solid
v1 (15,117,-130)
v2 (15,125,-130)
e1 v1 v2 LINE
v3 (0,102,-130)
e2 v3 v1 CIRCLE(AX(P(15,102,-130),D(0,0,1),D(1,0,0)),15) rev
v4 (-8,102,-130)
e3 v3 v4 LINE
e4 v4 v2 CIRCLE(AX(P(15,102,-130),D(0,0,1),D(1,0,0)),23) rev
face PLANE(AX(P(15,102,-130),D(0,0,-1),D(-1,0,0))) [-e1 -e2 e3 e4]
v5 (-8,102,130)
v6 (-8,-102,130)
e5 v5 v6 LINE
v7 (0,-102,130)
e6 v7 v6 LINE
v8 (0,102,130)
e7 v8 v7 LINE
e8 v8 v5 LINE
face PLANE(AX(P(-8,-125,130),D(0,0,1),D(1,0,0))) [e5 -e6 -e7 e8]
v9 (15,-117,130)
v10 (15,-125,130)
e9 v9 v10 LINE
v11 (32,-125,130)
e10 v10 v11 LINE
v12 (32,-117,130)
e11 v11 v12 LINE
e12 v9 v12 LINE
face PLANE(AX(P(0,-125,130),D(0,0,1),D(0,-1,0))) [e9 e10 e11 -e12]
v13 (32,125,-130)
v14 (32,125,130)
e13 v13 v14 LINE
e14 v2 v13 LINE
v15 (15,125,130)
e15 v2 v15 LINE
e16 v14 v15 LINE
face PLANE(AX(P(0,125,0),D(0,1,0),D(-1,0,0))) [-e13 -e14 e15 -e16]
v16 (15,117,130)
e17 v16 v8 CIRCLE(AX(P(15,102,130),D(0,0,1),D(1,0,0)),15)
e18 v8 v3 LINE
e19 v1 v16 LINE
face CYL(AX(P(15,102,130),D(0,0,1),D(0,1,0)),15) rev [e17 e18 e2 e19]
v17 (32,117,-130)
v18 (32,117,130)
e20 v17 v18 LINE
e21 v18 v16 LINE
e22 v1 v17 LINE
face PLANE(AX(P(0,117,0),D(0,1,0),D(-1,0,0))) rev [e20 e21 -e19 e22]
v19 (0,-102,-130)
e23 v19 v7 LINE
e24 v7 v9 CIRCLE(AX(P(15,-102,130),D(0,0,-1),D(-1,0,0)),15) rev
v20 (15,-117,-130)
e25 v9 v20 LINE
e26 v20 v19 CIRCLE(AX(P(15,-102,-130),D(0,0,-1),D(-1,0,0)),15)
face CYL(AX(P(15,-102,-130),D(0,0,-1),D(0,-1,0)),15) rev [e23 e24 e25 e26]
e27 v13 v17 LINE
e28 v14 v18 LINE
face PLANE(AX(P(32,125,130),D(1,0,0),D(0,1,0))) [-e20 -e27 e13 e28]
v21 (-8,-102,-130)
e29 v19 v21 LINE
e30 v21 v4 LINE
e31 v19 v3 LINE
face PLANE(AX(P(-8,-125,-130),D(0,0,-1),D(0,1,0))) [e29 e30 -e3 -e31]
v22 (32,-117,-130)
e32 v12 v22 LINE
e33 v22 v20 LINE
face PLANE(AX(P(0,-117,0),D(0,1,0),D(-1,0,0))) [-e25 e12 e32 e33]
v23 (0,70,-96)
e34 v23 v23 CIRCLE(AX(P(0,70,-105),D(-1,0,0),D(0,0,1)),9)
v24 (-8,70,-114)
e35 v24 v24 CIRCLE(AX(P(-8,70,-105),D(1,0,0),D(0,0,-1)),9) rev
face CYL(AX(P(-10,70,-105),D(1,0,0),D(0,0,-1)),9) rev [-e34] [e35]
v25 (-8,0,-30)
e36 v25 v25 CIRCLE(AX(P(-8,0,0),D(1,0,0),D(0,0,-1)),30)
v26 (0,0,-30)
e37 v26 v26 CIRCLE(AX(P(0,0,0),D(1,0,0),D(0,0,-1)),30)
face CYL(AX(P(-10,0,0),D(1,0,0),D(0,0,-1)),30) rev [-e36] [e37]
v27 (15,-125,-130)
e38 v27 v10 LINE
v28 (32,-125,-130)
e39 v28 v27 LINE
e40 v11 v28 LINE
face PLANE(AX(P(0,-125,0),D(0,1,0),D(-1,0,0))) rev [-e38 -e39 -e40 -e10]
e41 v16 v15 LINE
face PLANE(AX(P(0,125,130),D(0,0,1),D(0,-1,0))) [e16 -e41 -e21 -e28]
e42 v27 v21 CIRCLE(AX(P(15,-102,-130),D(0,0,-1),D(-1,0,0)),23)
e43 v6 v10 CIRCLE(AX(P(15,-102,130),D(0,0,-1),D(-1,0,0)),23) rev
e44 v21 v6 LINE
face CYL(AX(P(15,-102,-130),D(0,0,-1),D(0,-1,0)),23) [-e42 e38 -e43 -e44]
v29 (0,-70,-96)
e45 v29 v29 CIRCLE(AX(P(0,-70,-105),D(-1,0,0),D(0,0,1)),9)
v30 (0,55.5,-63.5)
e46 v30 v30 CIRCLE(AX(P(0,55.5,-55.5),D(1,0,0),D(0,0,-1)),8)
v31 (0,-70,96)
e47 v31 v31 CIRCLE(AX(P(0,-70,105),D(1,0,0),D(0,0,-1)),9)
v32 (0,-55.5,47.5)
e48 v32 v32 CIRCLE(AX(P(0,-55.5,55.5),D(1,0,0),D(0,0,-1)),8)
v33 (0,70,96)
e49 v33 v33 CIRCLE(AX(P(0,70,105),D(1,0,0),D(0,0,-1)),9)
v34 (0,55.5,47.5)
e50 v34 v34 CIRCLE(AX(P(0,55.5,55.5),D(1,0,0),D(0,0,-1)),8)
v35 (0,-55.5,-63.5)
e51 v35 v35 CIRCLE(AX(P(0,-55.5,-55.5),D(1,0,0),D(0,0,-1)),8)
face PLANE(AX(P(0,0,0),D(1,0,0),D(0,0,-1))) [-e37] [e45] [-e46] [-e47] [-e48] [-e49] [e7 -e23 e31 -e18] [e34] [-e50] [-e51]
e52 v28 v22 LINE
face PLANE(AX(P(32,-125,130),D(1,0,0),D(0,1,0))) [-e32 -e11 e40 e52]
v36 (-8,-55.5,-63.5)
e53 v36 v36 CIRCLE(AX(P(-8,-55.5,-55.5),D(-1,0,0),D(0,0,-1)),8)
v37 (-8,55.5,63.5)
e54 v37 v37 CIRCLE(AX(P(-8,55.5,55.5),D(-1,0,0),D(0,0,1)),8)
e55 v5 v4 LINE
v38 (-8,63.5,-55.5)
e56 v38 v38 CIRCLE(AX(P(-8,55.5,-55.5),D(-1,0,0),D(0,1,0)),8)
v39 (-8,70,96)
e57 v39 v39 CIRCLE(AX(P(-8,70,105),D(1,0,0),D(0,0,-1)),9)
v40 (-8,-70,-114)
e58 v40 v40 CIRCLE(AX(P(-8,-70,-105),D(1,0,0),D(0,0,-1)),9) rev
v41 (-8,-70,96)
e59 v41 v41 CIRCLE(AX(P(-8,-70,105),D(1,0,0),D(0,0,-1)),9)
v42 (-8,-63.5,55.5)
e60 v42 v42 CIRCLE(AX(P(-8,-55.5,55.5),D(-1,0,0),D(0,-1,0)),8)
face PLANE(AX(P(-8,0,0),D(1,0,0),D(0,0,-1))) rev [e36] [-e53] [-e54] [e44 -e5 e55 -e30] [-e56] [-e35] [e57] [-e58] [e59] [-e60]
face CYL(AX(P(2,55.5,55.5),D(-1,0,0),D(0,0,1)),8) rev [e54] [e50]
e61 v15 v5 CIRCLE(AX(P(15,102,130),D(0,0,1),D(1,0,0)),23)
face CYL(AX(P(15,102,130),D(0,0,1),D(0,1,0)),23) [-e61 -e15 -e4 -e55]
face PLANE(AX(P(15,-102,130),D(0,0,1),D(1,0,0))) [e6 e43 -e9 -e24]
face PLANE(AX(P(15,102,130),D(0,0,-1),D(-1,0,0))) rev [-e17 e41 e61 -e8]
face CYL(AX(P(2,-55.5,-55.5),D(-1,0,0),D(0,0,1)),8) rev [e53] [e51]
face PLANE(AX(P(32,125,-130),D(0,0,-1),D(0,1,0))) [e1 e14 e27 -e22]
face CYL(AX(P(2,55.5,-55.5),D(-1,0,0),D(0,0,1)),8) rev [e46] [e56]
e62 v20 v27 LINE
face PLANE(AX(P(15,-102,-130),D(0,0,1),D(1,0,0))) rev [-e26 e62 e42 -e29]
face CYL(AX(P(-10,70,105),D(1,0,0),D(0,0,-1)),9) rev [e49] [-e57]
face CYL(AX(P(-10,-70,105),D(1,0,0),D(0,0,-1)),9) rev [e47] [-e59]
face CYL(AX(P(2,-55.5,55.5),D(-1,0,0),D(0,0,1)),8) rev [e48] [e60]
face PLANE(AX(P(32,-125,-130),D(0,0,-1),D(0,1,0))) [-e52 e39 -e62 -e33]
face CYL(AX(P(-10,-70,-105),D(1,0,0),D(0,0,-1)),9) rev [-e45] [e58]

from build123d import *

# Parameters (mm, degrees)
SKETCH1_W                      = 260
SKETCH1_H                      = 250
BASE_FLANGE1_DEPTH             = 8
SKETCH2_R                      = 30
CUT_EXTRUDE1_DEPTH             = 10
EDGE_FLANGE1_STRIP_W           = 62
EDGE_FLANGE1_STRIP_H           = 8
EDGE_FLANGE1_STRIP_CUT_DEPTH   = 260
EDGE_FLANGE1_STRIP_2_W         = 62
EDGE_FLANGE1_STRIP_2_H         = 8
EDGE_FLANGE1_STRIP_CUT_2_DEPTH = 260
EDGE_FLANGE1_DEPTH             = 260
EDGE_FLANGE1_BEND_DEPTH        = 260
SKETCH9_R                      = 9
CUT_EXTRUDE2_DEPTH             = 10
SKETCH10_R                     = 8
CUT_EXTRUDE3_DEPTH             = 10
CIRPATTERN1_COUNT              = 4


# Sheet-metal steps are written as plain solids
with BuildPart() as part:
    # Sketch1 → Base-Flange1 (new body)
    with BuildSketch(Plane(origin=(0, 0, 0), x_dir=(0, 0, -1), z_dir=(1, 0, 0))):
        Rectangle(SKETCH1_W, SKETCH1_H)
    extrude(amount=-BASE_FLANGE1_DEPTH)

    # Sketch2 → Cut-Extrude1 (cut)
    with BuildSketch(Plane(origin=(0, 0, 0), x_dir=(0, 0, -1), z_dir=(1, 0, 0))):
        Circle(SKETCH2_R)
    extrude(amount=-CUT_EXTRUDE1_DEPTH, mode=Mode.SUBTRACT)

    # Edge-Flange1 strip (across the edge) → Edge-Flange1 strip cut (cut)
    with BuildSketch(Plane(origin=(0, 125, -130), x_dir=(0, -1, 0), z_dir=(0, 0, 1))):
        with Locations((-8, -4)):
            Rectangle(EDGE_FLANGE1_STRIP_W, EDGE_FLANGE1_STRIP_H)
    extrude(amount=EDGE_FLANGE1_STRIP_CUT_DEPTH, mode=Mode.SUBTRACT)

    # Edge-Flange1 strip 2 (across the edge) → Edge-Flange1 strip cut 2 (cut)
    with BuildSketch(Plane(origin=(0, -125, 130), x_dir=(0, 1, 0), z_dir=(0, 0, -1))):
        with Locations((-8, -4)):
            Rectangle(EDGE_FLANGE1_STRIP_2_W, EDGE_FLANGE1_STRIP_2_H)
    extrude(amount=EDGE_FLANGE1_STRIP_CUT_2_DEPTH, mode=Mode.SUBTRACT)

    # Edge-Flange1 section (across the edge) → Edge-Flange1 (add)
    with BuildSketch(Plane(origin=(0, 125, -130), x_dir=(0, -1, 0), z_dir=(0, 0, 1))):
        with BuildLine():
            Line((0, 15), (0, 32))
            Line((0, 32), (8, 32))
            Line((8, 32), (8, 15))
            ThreePointArc((8, 15), (12.393398282, 4.393398282), (23, 0))
            Line((23, 0), (23, -8))
            ThreePointArc((23, -8), (6.736544033, -1.263455967), (0, 15))
        make_face()
    extrude(amount=EDGE_FLANGE1_DEPTH)

    # Edge-Flange1 section 2 (across the edge) → Edge-Flange1 bend (add)
    with BuildSketch(Plane(origin=(0, -125, 130), x_dir=(0, 1, 0), z_dir=(0, 0, -1))):
        with BuildLine():
            Line((0, 15), (0, 32))
            Line((0, 32), (8, 32))
            Line((8, 32), (8, 15))
            ThreePointArc((8, 15), (12.393398282, 4.393398282), (23, 0))
            Line((23, 0), (23, -8))
            ThreePointArc((23, -8), (6.736544033, -1.263455967), (0, 15))
        make_face()
    extrude(amount=EDGE_FLANGE1_BEND_DEPTH)

    # Sketch9 → Cut-Extrude2 (cut)
    with BuildSketch(Plane(origin=(0, 0, 0), x_dir=(0, 0, -1), z_dir=(1, 0, 0))):
        with Locations((-105, -70)):
            Circle(SKETCH9_R)
        with Locations((-105, 70)):
            Circle(SKETCH9_R)
    cut_extrude2 = extrude(amount=-CUT_EXTRUDE2_DEPTH, mode=Mode.SUBTRACT)

    # Mirror1: Cut-Extrude2 across plane
    add(cut_extrude2.mirror(Plane.XY), mode=Mode.SUBTRACT)

    # Sketch10 → Cut-Extrude3 (cut)
    with BuildSketch(Plane.ZY.offset(8)):
        with Locations((55.5, 55.5)):
            Circle(SKETCH10_R)
    cut_extrude3 = extrude(amount=-CUT_EXTRUDE3_DEPTH, mode=Mode.SUBTRACT)

    # CirPattern1: Cut-Extrude3 ×4 about axis
    cirpattern1_axis = Axis((0, 0, 0), (1, 0, 0))
    for i in range(1, CIRPATTERN1_COUNT):
        add(cut_extrude3.rotate(cirpattern1_axis, i * 360 / CIRPATTERN1_COUNT), mode=Mode.SUBTRACT)


solid = part.part
